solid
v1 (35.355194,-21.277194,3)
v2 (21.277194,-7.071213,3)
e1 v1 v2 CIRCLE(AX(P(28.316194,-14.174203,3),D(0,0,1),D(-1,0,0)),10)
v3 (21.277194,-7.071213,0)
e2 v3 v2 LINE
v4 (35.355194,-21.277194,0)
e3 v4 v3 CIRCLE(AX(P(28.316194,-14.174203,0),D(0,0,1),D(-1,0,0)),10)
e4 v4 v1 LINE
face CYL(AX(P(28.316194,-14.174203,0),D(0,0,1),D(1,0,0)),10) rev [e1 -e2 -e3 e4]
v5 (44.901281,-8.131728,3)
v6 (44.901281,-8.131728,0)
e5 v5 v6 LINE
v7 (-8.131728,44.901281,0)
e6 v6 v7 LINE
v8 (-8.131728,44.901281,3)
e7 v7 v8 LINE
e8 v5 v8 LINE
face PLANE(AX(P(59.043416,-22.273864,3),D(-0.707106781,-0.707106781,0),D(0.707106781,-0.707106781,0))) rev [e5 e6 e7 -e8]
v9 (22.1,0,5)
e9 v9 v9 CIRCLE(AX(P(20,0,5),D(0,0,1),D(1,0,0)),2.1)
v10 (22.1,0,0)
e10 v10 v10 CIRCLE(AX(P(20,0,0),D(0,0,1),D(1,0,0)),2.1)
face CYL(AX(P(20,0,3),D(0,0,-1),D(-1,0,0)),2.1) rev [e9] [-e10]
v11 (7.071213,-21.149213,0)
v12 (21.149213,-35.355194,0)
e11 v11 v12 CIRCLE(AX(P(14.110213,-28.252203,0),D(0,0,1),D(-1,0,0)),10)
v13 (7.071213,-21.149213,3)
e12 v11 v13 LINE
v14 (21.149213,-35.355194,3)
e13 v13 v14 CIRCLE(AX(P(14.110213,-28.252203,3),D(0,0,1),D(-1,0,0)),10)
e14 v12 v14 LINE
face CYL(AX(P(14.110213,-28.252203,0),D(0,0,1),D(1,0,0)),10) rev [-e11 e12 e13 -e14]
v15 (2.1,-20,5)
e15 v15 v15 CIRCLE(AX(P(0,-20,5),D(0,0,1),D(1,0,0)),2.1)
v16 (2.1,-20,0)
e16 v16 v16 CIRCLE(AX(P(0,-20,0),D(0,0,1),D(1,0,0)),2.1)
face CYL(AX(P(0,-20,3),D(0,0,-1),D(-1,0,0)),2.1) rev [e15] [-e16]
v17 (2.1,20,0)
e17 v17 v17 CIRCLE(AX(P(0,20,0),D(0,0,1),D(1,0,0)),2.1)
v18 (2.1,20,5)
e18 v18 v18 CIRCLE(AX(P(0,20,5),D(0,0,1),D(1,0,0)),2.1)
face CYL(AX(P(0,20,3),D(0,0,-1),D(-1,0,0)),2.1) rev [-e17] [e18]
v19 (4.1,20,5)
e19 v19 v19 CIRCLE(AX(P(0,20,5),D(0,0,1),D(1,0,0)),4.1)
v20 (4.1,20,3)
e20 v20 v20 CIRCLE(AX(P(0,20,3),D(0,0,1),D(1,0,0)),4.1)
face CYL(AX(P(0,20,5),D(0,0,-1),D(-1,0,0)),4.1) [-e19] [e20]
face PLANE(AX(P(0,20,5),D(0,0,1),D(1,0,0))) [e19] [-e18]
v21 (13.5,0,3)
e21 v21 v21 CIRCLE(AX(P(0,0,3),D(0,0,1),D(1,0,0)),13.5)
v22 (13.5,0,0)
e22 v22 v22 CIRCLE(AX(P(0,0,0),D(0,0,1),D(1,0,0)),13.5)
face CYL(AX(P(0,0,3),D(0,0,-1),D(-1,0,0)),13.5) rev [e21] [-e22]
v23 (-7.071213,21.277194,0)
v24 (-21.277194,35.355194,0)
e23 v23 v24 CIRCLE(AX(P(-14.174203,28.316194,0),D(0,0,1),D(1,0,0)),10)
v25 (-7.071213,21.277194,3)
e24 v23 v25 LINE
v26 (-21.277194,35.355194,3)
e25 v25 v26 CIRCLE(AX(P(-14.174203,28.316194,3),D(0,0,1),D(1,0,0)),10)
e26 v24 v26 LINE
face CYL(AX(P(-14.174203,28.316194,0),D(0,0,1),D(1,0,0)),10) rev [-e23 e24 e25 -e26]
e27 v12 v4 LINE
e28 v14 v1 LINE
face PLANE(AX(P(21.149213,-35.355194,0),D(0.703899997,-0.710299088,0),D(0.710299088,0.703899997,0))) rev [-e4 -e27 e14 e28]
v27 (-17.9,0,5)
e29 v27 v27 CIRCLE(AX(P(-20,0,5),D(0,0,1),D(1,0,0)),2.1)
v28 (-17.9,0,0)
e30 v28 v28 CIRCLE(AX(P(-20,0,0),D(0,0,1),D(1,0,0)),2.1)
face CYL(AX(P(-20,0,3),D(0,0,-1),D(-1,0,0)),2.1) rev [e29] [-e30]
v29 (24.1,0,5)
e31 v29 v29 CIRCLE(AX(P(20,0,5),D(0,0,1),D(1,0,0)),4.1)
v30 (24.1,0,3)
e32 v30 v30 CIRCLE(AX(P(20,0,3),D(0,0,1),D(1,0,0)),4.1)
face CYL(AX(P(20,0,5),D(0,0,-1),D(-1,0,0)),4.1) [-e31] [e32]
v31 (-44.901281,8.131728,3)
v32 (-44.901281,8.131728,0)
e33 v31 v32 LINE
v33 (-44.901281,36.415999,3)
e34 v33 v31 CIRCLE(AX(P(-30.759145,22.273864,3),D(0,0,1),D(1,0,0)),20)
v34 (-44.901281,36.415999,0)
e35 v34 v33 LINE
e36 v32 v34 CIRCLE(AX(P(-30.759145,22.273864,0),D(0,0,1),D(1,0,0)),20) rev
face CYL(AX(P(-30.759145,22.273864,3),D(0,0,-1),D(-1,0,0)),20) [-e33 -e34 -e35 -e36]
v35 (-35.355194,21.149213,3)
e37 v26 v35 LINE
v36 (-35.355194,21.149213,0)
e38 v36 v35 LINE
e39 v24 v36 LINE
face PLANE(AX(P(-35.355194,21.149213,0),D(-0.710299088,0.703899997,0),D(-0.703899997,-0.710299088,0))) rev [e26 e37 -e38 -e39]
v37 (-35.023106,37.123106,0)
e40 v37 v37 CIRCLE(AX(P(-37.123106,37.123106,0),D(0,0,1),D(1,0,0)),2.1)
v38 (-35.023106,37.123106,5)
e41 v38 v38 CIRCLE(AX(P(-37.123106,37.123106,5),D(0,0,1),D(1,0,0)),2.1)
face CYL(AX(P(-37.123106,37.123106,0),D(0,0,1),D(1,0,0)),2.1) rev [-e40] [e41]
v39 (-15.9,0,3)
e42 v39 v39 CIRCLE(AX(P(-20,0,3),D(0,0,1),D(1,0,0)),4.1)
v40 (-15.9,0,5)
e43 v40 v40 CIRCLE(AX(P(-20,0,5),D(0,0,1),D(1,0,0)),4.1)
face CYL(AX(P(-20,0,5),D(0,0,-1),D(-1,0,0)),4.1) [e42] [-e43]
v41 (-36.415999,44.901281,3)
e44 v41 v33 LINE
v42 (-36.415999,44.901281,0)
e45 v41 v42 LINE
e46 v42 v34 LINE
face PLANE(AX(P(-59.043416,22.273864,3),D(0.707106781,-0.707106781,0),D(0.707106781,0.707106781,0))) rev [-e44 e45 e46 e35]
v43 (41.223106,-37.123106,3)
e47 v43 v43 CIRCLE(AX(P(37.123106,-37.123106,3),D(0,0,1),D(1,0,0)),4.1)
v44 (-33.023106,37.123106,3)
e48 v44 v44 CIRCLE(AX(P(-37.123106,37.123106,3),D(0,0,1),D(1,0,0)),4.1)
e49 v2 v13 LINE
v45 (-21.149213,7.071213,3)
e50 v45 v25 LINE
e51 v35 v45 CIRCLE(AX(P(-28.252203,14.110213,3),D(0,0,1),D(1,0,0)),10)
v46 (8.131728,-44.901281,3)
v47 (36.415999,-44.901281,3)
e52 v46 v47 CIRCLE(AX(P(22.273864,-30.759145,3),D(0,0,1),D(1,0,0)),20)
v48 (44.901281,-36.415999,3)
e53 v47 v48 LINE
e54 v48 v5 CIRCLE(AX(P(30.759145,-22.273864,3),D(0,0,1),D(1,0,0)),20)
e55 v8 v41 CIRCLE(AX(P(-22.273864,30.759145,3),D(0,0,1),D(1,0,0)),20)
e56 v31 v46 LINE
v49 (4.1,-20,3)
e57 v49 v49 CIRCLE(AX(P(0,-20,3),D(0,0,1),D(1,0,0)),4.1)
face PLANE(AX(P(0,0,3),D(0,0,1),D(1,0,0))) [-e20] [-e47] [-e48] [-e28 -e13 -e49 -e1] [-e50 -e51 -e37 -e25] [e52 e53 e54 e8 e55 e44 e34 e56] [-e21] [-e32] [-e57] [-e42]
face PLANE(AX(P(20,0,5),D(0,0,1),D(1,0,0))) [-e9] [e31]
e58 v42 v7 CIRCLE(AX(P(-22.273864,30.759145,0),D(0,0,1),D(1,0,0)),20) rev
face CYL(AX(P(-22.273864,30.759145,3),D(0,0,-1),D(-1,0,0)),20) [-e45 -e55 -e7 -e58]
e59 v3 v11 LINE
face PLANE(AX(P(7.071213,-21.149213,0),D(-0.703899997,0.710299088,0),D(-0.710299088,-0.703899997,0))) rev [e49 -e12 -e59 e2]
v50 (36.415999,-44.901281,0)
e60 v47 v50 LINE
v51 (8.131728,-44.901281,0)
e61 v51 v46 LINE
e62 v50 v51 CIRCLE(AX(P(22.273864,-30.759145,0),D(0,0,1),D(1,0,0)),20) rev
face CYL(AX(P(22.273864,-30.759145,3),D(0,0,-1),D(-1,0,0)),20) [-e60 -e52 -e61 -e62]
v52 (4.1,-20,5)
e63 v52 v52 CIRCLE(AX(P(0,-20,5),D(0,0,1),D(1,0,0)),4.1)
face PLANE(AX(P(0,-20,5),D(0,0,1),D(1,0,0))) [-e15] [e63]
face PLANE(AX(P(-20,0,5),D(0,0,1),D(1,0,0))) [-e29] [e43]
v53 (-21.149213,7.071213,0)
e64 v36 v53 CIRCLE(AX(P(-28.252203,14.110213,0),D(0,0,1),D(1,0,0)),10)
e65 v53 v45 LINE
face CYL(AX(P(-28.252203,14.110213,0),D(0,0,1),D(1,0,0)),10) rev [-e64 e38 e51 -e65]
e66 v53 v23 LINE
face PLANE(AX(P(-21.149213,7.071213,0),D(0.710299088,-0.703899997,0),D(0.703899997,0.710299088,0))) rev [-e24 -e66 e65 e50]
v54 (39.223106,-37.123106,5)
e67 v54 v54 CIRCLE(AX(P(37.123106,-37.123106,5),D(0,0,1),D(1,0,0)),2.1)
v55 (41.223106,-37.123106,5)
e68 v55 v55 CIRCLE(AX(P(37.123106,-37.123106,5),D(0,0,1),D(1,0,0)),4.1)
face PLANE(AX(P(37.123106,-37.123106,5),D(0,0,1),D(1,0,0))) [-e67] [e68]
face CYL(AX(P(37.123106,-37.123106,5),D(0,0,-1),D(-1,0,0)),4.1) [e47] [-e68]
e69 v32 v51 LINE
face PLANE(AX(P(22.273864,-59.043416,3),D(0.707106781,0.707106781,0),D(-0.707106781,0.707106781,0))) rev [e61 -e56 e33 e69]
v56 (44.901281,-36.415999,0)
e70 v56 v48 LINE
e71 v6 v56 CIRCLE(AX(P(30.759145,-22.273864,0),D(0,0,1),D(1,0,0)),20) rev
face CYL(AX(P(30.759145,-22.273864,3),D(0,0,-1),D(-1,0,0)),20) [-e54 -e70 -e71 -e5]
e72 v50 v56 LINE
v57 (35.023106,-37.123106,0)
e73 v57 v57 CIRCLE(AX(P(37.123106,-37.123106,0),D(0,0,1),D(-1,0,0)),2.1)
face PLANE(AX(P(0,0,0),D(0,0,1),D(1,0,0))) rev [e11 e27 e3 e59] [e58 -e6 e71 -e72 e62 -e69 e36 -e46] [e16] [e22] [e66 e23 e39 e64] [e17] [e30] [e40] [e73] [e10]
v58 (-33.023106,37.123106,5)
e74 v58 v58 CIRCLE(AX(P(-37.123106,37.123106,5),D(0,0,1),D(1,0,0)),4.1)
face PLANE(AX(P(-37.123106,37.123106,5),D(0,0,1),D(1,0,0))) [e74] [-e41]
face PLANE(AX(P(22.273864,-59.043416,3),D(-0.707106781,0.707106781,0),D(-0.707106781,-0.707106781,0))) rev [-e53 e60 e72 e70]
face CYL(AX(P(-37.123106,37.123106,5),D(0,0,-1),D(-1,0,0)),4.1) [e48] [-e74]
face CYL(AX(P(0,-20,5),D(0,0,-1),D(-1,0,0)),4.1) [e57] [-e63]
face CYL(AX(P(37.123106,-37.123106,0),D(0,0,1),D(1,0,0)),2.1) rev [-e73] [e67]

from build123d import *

# Parameters (mm, degrees)
ESQUISSE1_R             = 2.1
ESQUISSE1_R_2           = 13.5
BOSS_EXTRU_1_DEPTH      = 3
ESQUISSE2_R             = 2.1
ENL_V_MAT_EXTRU_1_DEPTH = 3
ESQUISSE3_R             = 4.1
ESQUISSE3_R_2           = 2.1
BOSS_EXTRU_2_DEPTH      = 2
ENL_V_MAT_EXTRU_2_DEPTH = 3
CONG_1_R                = 20


with BuildPart() as part:
    # Esquisse1 → Boss.-Extru.1 (new body)
    with BuildSketch(Plane.XY):
        Polygon((22.273863607, -59.043416229), (-59.043416229, 22.273863607), (-22.273863607, 59.043416229), (59.043416229, -22.273863607), align=None)
        with Locations((0, 20)):
            Circle(ESQUISSE1_R, mode=Mode.SUBTRACT)
        Circle(ESQUISSE1_R_2, mode=Mode.SUBTRACT)
        with Locations((20, 0)):
            Circle(ESQUISSE1_R, mode=Mode.SUBTRACT)
        with Locations((0, -20)):
            Circle(ESQUISSE1_R, mode=Mode.SUBTRACT)
        with Locations((-20, 0)):
            Circle(ESQUISSE1_R, mode=Mode.SUBTRACT)
    extrude(amount=BOSS_EXTRU_1_DEPTH)

    # Esquisse2 → Enlèv. mat.-Extru.1 (cut)
    with BuildSketch(Plane.XY.offset(3)):
        with Locations((-37.123106012, 37.123106012)):
            Circle(ESQUISSE2_R)
        with Locations((37.123106012, -37.123106012)):
            Circle(ESQUISSE2_R)
    extrude(amount=-ENL_V_MAT_EXTRU_1_DEPTH, mode=Mode.SUBTRACT)

    # Esquisse3 → Boss.-Extru.2 (add)
    # profile 1 of 6: a face of its own
    with BuildSketch(Plane.XY.offset(3)):
        with Locations((37.123106012, -37.123106012)):
            Circle(ESQUISSE3_R)
        with Locations((37.123106012, -37.123106012)):
            Circle(ESQUISSE3_R_2, mode=Mode.SUBTRACT)
    # profile 2 of 6: a face of its own
    with BuildSketch(Plane.XY.offset(3)):
        with Locations((20, 0)):
            Circle(ESQUISSE3_R)
        with Locations((20, 0)):
            Circle(ESQUISSE3_R_2, mode=Mode.SUBTRACT)
    # profile 3 of 6: a face of its own
    with BuildSketch(Plane.XY.offset(3)):
        with Locations((0, -20)):
            Circle(ESQUISSE3_R)
        with Locations((0, -20)):
            Circle(ESQUISSE3_R_2, mode=Mode.SUBTRACT)
    # profile 4 of 6: a face of its own
    with BuildSketch(Plane.XY.offset(3)):
        with Locations((-20, 0)):
            Circle(ESQUISSE3_R)
        with Locations((-20, 0)):
            Circle(ESQUISSE3_R_2, mode=Mode.SUBTRACT)
    # profile 5 of 6: a face of its own
    with BuildSketch(Plane.XY.offset(3)):
        with Locations((-37.123106012, 37.123106012)):
            Circle(ESQUISSE3_R)
        with Locations((-37.123106012, 37.123106012)):
            Circle(ESQUISSE3_R_2, mode=Mode.SUBTRACT)
    # profile 6 of 6: a face of its own
    with BuildSketch(Plane.XY.offset(3)):
        with Locations((0, 20)):
            Circle(ESQUISSE3_R)
        with Locations((0, 20)):
            Circle(ESQUISSE3_R_2, mode=Mode.SUBTRACT)
    extrude(amount=BOSS_EXTRU_2_DEPTH)

    # Esquisse4 → Enlèv. mat.-Extru.2 (cut)
    with BuildSketch(Plane.XY.offset(3)):
        with BuildLine():
            Line((-35.355194284, 21.149212527), (-21.277194344, 35.355194284))
            ThreePointArc((-21.277194344, 35.355194284), (-7.135203496, 35.419185193), (-7.071212587, 21.277194344))
            Line((-7.071212587, 21.277194344), (-21.149212527, 7.071212587))
            ThreePointArc((-21.149212527, 7.071212587), (-35.291203375, 7.007221678), (-35.355194284, 21.149212527))
        make_face()
        with BuildLine():
            Line((21.149212527, -35.355194284), (35.355194284, -21.277194344))
            ThreePointArc((35.355194284, -21.277194344), (35.419185193, -7.135203496), (21.277194344, -7.071212587))
            Line((21.277194344, -7.071212587), (7.071212587, -21.149212527))
            ThreePointArc((7.071212587, -21.149212527), (7.007221678, -35.291203375), (21.149212527, -35.355194284))
        make_face()
    extrude(amount=-ENL_V_MAT_EXTRU_2_DEPTH, mode=Mode.SUBTRACT)

    # Congé1
    cong_1_edges = [part.edges().sort_by_distance(p)[0] for p in [
        (22.273863607, -59.043416229, 1.5),
        (59.043416229, -22.273863607, 1.5),
        (-22.273863607, 59.043416229, 1.5),
        (-59.043416229, 22.273863607, 1.5),
    ]]
    fillet(cong_1_edges, radius=CONG_1_R)


solid = part.part
